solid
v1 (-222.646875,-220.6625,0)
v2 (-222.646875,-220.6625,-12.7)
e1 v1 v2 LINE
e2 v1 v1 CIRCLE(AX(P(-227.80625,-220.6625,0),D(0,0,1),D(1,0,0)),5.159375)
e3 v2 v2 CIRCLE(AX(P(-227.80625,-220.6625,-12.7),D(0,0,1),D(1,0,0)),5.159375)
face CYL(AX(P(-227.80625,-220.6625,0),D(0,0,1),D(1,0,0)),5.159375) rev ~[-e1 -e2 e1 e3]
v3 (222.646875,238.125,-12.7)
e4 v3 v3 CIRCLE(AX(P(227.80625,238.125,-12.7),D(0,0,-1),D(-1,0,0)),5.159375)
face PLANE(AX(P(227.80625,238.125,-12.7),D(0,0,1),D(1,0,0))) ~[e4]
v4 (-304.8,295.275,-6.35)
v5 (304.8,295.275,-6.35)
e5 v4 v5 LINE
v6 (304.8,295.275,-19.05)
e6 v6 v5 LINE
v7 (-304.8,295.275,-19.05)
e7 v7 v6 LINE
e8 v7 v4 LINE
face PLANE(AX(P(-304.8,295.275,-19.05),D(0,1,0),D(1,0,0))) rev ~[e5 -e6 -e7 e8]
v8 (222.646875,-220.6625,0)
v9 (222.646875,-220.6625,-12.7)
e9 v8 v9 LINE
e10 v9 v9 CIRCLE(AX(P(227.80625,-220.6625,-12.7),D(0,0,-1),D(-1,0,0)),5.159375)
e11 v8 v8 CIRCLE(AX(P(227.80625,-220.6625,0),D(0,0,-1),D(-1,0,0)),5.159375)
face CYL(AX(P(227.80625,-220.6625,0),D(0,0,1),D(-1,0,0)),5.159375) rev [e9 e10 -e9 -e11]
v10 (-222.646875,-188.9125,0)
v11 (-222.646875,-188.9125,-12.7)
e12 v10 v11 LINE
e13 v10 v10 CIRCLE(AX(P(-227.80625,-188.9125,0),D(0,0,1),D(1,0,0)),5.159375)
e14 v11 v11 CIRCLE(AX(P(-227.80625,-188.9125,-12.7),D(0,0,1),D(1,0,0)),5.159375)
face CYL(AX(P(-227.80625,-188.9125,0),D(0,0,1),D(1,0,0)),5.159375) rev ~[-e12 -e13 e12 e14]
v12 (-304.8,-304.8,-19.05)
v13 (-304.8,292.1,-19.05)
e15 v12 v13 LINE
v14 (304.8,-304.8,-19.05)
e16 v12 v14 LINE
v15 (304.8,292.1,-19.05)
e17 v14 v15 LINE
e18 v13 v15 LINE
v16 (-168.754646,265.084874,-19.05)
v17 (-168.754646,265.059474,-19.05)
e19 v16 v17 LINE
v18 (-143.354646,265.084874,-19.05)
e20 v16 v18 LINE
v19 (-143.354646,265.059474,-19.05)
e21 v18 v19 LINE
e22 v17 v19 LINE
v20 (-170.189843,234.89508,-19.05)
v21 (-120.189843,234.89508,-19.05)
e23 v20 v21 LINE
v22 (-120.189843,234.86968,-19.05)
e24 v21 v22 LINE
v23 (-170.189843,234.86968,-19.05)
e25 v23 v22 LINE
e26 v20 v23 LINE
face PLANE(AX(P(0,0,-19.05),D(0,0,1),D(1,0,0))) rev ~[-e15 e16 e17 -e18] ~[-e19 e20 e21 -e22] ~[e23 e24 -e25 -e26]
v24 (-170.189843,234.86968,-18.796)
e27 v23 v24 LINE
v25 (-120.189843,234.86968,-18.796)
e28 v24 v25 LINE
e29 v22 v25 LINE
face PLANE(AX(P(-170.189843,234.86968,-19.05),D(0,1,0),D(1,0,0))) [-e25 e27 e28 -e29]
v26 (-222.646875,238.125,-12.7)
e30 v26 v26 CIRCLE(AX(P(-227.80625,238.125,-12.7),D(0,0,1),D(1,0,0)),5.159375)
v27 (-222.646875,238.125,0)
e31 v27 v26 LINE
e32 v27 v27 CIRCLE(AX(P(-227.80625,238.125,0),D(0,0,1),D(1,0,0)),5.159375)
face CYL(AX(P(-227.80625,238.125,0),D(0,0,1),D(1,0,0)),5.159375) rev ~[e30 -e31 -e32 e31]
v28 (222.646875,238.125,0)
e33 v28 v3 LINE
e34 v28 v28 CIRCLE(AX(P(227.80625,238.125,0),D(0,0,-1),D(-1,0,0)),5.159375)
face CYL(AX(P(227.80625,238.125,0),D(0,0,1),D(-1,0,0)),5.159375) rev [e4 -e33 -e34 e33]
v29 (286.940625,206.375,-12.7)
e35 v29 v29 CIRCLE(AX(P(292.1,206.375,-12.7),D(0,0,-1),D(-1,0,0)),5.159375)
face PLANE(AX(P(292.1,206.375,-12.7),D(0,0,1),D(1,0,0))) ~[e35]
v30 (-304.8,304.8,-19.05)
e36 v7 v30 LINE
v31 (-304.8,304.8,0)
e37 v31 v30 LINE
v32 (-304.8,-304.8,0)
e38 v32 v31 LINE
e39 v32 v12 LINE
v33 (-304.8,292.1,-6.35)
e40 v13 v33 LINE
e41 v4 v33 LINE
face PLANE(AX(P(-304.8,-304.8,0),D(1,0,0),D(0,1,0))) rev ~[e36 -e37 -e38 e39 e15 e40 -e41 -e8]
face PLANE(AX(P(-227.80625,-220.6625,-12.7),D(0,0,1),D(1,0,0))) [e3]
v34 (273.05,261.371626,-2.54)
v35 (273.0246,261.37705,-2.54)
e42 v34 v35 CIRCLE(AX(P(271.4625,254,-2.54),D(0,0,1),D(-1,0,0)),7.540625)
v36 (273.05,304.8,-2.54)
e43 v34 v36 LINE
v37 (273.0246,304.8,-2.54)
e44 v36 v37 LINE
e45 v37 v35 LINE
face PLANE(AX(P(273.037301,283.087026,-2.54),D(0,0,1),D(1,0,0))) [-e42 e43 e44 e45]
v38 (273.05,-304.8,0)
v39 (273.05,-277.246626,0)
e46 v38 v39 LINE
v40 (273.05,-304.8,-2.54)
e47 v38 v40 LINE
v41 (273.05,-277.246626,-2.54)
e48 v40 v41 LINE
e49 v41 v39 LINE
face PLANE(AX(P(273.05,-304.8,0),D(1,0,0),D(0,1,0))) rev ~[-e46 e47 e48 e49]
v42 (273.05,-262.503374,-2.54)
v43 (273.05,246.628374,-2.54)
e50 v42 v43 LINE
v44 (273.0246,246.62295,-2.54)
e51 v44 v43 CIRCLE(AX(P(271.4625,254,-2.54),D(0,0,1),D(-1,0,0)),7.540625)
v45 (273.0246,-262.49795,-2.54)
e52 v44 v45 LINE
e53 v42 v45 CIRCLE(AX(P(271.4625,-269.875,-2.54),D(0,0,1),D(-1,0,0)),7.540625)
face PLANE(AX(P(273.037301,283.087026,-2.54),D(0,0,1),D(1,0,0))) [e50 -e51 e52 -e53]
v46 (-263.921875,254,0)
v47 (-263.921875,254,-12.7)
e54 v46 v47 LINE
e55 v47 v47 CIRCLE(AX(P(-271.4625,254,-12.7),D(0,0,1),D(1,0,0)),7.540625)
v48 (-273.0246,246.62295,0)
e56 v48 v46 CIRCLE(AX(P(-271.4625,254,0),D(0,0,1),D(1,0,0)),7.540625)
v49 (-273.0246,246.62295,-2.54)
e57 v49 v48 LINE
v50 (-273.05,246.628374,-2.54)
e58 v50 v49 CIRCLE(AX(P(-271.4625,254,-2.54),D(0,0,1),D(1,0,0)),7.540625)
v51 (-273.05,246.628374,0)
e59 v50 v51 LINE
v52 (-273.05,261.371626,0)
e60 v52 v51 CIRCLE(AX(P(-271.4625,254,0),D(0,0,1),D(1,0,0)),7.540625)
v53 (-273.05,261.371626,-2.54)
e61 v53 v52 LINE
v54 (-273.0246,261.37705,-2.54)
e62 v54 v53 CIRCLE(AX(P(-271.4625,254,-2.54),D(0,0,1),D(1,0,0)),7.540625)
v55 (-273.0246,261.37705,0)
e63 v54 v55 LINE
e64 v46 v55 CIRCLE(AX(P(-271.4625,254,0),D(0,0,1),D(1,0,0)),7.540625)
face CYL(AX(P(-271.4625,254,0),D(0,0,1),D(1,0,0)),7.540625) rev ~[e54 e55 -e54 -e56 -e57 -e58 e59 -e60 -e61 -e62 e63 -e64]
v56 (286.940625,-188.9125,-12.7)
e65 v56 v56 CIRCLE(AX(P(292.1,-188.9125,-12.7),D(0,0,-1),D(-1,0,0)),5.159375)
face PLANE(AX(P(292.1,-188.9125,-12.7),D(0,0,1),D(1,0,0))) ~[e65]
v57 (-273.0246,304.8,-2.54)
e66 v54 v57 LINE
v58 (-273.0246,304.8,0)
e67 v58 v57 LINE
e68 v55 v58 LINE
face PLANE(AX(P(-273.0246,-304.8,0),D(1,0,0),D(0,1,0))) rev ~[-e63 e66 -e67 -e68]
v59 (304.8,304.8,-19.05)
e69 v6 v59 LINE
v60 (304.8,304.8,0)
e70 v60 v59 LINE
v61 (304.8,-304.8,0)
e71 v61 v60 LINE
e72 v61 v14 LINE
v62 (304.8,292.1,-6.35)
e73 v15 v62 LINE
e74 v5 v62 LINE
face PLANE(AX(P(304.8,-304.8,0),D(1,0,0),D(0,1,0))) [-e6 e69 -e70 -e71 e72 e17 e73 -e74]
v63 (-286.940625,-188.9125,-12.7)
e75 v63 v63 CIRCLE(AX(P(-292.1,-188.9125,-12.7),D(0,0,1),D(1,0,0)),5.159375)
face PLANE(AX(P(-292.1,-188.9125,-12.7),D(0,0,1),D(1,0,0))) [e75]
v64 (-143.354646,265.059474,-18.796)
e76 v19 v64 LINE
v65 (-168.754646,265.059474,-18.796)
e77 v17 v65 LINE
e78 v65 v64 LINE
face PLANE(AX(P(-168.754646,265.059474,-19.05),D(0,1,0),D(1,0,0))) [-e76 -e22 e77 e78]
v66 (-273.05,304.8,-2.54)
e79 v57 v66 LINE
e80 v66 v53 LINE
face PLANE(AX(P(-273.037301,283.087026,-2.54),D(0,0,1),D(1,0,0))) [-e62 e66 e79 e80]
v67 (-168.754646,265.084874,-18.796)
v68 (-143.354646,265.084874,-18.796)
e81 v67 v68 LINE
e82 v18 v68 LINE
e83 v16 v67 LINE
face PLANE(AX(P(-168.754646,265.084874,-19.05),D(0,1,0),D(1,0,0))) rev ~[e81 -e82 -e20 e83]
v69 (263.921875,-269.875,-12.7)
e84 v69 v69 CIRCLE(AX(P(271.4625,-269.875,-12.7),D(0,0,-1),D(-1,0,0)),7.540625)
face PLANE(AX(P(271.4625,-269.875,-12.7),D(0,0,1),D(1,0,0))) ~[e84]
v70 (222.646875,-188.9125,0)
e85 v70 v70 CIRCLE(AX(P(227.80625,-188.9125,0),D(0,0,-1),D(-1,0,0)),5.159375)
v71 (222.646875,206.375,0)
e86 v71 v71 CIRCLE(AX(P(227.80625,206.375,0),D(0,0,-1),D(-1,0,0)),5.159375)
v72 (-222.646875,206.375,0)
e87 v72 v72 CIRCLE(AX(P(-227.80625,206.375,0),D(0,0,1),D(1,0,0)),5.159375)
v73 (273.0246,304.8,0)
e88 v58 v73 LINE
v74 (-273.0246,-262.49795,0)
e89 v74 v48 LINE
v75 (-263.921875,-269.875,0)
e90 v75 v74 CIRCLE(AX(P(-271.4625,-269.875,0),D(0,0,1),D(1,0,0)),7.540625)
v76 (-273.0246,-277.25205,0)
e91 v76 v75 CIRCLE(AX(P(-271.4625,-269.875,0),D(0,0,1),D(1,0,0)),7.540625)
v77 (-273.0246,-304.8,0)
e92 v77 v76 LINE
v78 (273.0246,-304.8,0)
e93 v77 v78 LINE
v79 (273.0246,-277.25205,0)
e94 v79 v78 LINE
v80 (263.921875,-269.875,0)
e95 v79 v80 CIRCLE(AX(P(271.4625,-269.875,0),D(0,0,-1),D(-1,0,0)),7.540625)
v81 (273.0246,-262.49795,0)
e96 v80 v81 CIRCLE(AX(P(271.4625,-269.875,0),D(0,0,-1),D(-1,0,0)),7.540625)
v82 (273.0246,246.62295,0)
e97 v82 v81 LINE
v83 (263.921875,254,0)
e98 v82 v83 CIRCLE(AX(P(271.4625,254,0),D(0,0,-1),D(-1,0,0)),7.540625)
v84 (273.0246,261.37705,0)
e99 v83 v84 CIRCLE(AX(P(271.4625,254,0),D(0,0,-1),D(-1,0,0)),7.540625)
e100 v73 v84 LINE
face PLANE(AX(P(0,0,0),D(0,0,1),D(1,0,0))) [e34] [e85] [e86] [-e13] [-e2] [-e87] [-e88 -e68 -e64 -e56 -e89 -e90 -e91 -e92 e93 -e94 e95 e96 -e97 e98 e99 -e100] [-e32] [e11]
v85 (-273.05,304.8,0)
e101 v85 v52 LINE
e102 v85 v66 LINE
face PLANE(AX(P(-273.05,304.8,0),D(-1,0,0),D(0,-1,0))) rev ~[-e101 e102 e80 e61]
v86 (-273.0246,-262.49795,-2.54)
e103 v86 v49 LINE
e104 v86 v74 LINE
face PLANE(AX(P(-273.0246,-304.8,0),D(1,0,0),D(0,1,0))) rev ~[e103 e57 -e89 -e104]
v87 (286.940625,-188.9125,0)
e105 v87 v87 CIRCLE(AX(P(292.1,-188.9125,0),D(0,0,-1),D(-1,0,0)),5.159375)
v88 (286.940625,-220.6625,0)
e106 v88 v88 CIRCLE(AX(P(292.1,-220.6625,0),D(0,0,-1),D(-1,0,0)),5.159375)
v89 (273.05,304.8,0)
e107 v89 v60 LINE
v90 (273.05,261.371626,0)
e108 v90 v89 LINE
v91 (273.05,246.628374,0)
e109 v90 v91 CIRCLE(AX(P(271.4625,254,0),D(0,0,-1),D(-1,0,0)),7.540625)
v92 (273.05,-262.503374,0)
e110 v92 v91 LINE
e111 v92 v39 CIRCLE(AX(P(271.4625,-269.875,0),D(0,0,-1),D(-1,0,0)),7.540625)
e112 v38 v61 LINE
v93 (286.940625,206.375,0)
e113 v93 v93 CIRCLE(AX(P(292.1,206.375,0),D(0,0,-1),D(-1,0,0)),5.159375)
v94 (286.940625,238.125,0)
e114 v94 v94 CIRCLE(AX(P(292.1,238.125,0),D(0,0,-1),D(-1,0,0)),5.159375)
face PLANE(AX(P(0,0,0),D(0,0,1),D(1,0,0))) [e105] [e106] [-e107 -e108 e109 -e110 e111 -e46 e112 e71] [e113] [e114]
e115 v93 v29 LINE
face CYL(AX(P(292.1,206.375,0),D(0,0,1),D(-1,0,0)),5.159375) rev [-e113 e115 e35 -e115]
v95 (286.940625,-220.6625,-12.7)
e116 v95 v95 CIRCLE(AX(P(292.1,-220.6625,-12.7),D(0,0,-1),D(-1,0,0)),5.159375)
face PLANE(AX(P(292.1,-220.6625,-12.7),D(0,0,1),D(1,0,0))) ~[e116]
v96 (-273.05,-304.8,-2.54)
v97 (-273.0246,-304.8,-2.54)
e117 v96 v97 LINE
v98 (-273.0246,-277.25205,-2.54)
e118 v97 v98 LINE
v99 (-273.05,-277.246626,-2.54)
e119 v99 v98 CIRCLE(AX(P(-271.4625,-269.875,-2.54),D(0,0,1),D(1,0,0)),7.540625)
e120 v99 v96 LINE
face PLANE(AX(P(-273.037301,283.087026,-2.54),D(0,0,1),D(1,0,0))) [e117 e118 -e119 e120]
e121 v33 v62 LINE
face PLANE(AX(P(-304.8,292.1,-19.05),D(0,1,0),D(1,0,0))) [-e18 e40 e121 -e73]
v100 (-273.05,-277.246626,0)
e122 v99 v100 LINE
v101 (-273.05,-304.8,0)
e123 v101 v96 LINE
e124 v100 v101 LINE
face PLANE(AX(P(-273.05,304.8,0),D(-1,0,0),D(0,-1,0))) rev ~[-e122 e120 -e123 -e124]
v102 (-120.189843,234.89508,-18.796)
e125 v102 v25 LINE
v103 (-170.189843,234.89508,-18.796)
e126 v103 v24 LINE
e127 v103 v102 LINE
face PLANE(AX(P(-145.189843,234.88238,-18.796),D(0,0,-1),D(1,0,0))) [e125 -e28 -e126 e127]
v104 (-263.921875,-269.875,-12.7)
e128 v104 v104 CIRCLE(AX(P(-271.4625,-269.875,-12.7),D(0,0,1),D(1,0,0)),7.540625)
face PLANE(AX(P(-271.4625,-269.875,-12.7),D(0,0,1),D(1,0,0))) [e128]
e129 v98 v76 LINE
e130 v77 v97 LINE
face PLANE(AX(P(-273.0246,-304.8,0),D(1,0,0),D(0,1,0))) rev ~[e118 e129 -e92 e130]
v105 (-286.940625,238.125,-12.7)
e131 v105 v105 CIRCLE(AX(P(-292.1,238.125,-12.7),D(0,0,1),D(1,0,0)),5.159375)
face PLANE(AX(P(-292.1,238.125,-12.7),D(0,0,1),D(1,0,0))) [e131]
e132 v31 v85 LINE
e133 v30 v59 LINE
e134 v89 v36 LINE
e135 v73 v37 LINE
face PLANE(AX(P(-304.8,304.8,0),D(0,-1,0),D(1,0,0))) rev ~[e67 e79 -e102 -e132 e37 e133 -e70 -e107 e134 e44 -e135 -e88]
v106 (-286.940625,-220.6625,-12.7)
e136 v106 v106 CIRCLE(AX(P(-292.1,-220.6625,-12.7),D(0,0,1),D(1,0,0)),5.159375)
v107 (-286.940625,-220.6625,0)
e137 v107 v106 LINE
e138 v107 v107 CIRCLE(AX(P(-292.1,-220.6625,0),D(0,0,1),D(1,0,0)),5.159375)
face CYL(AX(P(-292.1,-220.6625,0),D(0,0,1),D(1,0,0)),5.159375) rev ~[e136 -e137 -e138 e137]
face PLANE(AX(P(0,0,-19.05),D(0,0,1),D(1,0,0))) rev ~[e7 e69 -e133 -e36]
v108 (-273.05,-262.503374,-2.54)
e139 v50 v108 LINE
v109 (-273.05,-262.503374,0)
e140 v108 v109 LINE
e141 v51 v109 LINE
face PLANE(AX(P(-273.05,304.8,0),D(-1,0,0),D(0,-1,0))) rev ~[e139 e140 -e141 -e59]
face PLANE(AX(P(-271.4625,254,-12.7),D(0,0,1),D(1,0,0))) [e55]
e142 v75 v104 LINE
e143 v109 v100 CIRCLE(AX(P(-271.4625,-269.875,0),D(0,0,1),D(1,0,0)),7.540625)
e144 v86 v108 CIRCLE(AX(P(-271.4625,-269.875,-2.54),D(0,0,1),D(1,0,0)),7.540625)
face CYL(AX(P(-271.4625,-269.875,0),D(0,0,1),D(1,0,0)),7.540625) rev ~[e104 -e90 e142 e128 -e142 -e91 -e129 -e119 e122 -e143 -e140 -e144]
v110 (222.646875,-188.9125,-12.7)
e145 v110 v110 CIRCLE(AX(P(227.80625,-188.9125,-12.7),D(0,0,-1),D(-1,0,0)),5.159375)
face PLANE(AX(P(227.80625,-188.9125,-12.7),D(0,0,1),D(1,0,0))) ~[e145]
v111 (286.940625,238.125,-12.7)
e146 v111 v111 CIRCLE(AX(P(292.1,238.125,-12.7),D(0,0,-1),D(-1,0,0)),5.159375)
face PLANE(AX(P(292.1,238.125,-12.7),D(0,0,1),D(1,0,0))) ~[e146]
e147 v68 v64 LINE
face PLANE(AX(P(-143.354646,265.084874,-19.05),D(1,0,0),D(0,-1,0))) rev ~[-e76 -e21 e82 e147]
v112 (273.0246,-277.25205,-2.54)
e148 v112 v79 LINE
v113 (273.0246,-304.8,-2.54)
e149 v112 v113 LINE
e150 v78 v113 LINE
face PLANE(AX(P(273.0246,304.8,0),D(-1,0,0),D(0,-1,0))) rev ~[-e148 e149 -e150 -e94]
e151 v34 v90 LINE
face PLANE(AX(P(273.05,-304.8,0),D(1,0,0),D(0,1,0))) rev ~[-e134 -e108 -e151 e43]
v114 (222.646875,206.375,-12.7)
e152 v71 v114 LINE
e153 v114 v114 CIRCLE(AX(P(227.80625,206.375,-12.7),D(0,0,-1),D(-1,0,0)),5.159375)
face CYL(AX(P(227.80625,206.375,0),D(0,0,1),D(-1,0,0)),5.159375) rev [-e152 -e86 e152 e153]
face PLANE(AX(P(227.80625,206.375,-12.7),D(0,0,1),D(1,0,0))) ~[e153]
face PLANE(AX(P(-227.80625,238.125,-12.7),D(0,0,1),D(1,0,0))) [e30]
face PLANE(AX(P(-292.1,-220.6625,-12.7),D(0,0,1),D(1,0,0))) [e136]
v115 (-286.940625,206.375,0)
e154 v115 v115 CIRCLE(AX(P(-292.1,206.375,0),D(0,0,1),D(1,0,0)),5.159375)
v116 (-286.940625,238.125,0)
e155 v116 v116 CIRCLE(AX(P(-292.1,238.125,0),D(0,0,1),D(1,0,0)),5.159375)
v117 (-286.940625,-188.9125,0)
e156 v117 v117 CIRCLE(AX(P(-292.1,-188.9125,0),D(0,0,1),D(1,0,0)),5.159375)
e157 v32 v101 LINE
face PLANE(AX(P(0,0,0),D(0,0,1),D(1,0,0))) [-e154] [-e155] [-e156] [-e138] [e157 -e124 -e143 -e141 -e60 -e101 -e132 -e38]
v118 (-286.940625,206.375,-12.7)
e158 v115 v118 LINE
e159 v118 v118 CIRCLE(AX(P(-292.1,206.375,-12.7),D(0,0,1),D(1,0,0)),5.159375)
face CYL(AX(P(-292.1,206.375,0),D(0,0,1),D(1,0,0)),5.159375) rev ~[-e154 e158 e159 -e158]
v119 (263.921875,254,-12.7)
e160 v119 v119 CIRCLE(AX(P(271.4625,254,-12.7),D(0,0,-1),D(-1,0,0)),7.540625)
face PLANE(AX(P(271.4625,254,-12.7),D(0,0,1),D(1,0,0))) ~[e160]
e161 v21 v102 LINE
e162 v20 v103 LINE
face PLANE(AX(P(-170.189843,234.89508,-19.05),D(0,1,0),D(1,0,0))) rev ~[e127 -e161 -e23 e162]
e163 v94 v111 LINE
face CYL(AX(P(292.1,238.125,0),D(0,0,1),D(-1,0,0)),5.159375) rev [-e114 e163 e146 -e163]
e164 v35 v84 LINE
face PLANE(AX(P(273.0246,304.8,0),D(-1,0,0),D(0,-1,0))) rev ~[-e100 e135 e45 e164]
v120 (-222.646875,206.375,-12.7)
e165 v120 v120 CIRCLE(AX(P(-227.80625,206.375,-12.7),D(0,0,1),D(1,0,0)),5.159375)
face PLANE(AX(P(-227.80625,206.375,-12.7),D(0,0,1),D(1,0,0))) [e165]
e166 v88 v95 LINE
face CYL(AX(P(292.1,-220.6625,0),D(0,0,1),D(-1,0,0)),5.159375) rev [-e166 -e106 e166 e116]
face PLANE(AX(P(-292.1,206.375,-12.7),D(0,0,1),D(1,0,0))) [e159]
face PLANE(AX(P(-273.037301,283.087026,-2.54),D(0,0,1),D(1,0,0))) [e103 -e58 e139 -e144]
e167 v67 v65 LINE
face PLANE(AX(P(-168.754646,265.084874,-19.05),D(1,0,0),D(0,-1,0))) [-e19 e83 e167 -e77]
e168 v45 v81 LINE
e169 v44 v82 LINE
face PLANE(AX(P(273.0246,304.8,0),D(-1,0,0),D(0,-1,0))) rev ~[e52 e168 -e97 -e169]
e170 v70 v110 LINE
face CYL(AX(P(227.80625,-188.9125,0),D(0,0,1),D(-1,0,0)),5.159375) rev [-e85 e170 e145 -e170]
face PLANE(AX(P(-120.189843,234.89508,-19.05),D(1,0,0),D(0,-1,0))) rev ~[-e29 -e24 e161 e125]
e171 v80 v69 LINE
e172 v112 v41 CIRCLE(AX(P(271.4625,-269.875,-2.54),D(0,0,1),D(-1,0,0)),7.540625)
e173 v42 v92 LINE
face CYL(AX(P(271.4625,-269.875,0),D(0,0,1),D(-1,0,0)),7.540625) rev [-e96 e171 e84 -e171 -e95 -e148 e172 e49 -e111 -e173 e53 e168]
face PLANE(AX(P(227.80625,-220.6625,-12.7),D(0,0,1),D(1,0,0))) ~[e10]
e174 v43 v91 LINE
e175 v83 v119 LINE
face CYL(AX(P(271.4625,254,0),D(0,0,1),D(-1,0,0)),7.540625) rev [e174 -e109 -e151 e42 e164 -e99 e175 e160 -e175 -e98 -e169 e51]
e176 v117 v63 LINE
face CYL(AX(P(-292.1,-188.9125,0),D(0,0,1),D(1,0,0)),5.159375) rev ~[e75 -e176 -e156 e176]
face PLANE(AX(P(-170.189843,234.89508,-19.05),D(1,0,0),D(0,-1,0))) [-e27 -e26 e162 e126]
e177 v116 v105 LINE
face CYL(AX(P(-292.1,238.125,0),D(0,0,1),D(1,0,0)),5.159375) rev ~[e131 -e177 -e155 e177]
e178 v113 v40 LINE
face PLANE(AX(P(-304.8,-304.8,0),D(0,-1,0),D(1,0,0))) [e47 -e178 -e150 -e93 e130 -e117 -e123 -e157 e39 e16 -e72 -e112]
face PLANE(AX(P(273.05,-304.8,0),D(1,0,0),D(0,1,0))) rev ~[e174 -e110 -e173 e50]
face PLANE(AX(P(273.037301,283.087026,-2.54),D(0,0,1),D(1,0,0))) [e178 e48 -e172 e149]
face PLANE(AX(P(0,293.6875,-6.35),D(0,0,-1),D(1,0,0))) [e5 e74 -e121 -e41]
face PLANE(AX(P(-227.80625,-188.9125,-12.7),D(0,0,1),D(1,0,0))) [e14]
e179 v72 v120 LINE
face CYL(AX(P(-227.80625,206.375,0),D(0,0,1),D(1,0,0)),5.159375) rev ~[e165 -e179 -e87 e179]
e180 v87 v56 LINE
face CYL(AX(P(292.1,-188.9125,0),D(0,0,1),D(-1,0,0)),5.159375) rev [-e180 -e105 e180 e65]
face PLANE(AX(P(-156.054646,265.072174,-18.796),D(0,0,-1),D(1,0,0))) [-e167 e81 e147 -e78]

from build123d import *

# Parameters (mm, degrees)
F0_W     = 609.6
F0_H     = 609.6
F0_R     = 7.540625
F0_R_2   = 5.159375
F1_DEPTH = 19.05
F2_DEPTH = 12.7
F3_W     = 609.6
F3_H     = 3.175
F4_DEPTH = 12.7
F5_W     = 25.4
F5_H     = 0.0254
F5_W_2   = 50
F6_DEPTH = 0.254
F8_DEPTH = 2.54


# Not quite as in the source:
# - a pattern or mirror of a feature is missing from the dataset's text; its kind, count and spacing are read off the source's solid
# - a feature names something its author has since deleted; it is built from what else it names


with BuildPart() as f1:
    # F0 (on Top) → F1 (new body)
    with BuildSketch(Plane.XY):
        Rectangle(F0_W, F0_H)
        with Locations((-271.4625, -269.875)):
            Circle(F0_R, mode=Mode.SUBTRACT)
        with Locations((-292.1, -220.6625)):
            Circle(F0_R_2, mode=Mode.SUBTRACT)
        with Locations((-292.1, -188.9125)):
            Circle(F0_R_2, mode=Mode.SUBTRACT)
        with Locations((-227.80625, -220.6625)):
            Circle(F0_R_2, mode=Mode.SUBTRACT)
        with Locations((-227.80625, -188.9125)):
            Circle(F0_R_2, mode=Mode.SUBTRACT)
        with Locations((-292.1, 206.375)):
            Circle(F0_R_2, mode=Mode.SUBTRACT)
        with Locations((-227.80625, 206.375)):
            Circle(F0_R_2, mode=Mode.SUBTRACT)
        with Locations((-292.1, 238.125)):
            Circle(F0_R_2, mode=Mode.SUBTRACT)
        with Locations((-271.4625, 254)):
            Circle(F0_R, mode=Mode.SUBTRACT)
        with Locations((-227.80625, 238.125)):
            Circle(F0_R_2, mode=Mode.SUBTRACT)
        with Locations((-227.80625, 206.375)):
            Circle(F0_R_2)
        with Locations((-227.80625, 238.125)):
            Circle(F0_R_2)
        with Locations((-227.80625, -188.9125)):
            Circle(F0_R_2)
        with Locations((-227.80625, -220.6625)):
            Circle(F0_R_2)
        with Locations((-271.4625, -269.875)):
            Circle(F0_R)
        with Locations((-271.4625, 254)):
            Circle(F0_R)
        with Locations((-292.1, 238.125)):
            Circle(F0_R_2)
        with Locations((-292.1, 206.375)):
            Circle(F0_R_2)
        with Locations((-292.1, -220.6625)):
            Circle(F0_R_2)
        with Locations((-292.1, -188.9125)):
            Circle(F0_R_2)
    extrude(amount=-F1_DEPTH)

    # F0 (on Top) → F2 (cut)
    with BuildSketch(Plane.XY):
        with Locations((-271.4625, -269.875)):
            Circle(F0_R)
        with Locations((-292.1, -220.6625)):
            Circle(F0_R_2)
        with Locations((-227.80625, -220.6625)):
            Circle(F0_R_2)
        with Locations((-227.80625, -188.9125)):
            Circle(F0_R_2)
        with Locations((-292.1, -188.9125)):
            Circle(F0_R_2)
        with Locations((-292.1, 206.375)):
            Circle(F0_R_2)
        with Locations((-227.80625, 206.375)):
            Circle(F0_R_2)
        with Locations((-227.80625, 238.125)):
            Circle(F0_R_2)
        with Locations((-292.1, 238.125)):
            Circle(F0_R_2)
        with Locations((-271.4625, 254)):
            Circle(F0_R)
    f2 = extrude(amount=-F2_DEPTH, mode=Mode.SUBTRACT)

    # F2_copies: F2 across plane
    add(f2.mirror(Plane(origin=(0, 0, 0), x_dir=(0, 0, 1), z_dir=(1, 0, 0))), mode=Mode.SUBTRACT)

    # F3 (on face) → F4 (cut)
    with BuildSketch(Plane(origin=(0, 0, -19.05), x_dir=(1, 0, 0), z_dir=(0, 0, -1))):
        with Locations((0, -293.6875)):
            Rectangle(F3_W, F3_H)
    extrude(amount=-F4_DEPTH, mode=Mode.SUBTRACT)

    # F5 (on face) → F6 (cut)
    with BuildSketch(Plane(origin=(0, 0, -19.05), x_dir=(1, 0, 0), z_dir=(0, 0, -1))):
        with Locations((-156.0546457767, -265.0721735465)):
            Rectangle(F5_W, F5_H)
        with Locations((-145.1898425817, -234.882380328)):
            Rectangle(F5_W_2, F5_H)
    extrude(amount=-F6_DEPTH, mode=Mode.SUBTRACT)

    # F7 (on face) → F8 (cut)
    with BuildSketch(Plane.XY):
        with BuildLine():
            Line((273.05, 304.8), (273.0246, 304.8))
            Line((273.0246, 304.8), (273.0246, 261.3770501544))
            ThreePointArc((273.0246, 261.3770501544), (273.0373023354, 261.3743489879), (273.05, 261.3716259496))
            Line((273.05, 261.3716259496), (273.05, 304.8))
        make_face()
        with BuildLine():
            ThreePointArc((273.05, 261.3716259496), (273.0373023354, 261.3743489879), (273.0246, 261.3770501544))
            Line((273.0246, 261.3770501544), (273.0246, 246.6229498456))
            ThreePointArc((273.0246, 246.6229498456), (273.0373023354, 246.6256510121), (273.05, 246.6283740504))
            Line((273.05, 246.6283740504), (273.05, 261.3716259496))
        make_face()
        with BuildLine():
            ThreePointArc((273.05, 246.6283740504), (273.0373023354, 246.6256510121), (273.0246, 246.6229498456))
            Line((273.0246, 246.6229498456), (273.0246, -262.4979498456))
            ThreePointArc((273.0246, -262.4979498456), (273.0373023354, -262.5006510121), (273.05, -262.5033740504))
            Line((273.05, -262.5033740504), (273.05, 246.6283740504))
        make_face()
        with BuildLine():
            ThreePointArc((273.05, -262.5033740504), (273.0373023354, -262.5006510121), (273.0246, -262.4979498456))
            Line((273.0246, -262.4979498456), (273.0246, -277.2520501544))
            ThreePointArc((273.0246, -277.2520501544), (273.0373023354, -277.2493489879), (273.05, -277.2466259496))
            Line((273.05, -277.2466259496), (273.05, -262.5033740504))
        make_face()
        with BuildLine():
            Line((273.0246, -277.2520501544), (273.0246, -304.8))
            Line((273.0246, -304.8), (273.05, -304.8))
            Line((273.05, -304.8), (273.05, -277.2466259496))
            ThreePointArc((273.05, -277.2466259496), (273.0373023354, -277.2493489879), (273.0246, -277.2520501544))
        make_face()
        with BuildLine():
            Line((-273.0246, 304.8), (-273.05, 304.8))
            Line((-273.05, 304.8), (-273.05, 261.3716259496))
            ThreePointArc((-273.05, 261.3716259496), (-273.0373023354, 261.3743489879), (-273.0246, 261.3770501544))
            Line((-273.0246, 261.3770501544), (-273.0246, 304.8))
        make_face()
        with BuildLine():
            ThreePointArc((-273.0246, 261.3770501544), (-273.0373023354, 261.3743489879), (-273.05, 261.3716259496))
            Line((-273.05, 261.3716259496), (-273.05, 246.6283740504))
            ThreePointArc((-273.05, 246.6283740504), (-273.0373023354, 246.6256510121), (-273.0246, 246.6229498456))
            Line((-273.0246, 246.6229498456), (-273.0246, 261.3770501544))
        make_face()
        with BuildLine():
            ThreePointArc((-273.0246, -262.4979498456), (-273.0373023354, -262.5006510121), (-273.05, -262.5033740504))
            Line((-273.05, -262.5033740504), (-273.05, -277.2466259496))
            ThreePointArc((-273.05, -277.2466259496), (-273.0373023354, -277.2493489879), (-273.0246, -277.2520501544))
            Line((-273.0246, -277.2520501544), (-273.0246, -262.4979498456))
        make_face()
        with BuildLine():
            Line((-273.05, -277.2466259496), (-273.05, -304.8))
            Line((-273.05, -304.8), (-273.0246, -304.8))
            Line((-273.0246, -304.8), (-273.0246, -277.2520501544))
            ThreePointArc((-273.0246, -277.2520501544), (-273.0373023354, -277.2493489879), (-273.05, -277.2466259496))
        make_face()
        with BuildLine():
            ThreePointArc((-273.0246, 246.6229498456), (-273.0373023354, 246.6256510121), (-273.05, 246.6283740504))
            Line((-273.05, 246.6283740504), (-273.05, -262.5033740504))
            ThreePointArc((-273.05, -262.5033740504), (-273.0373023354, -262.5006510121), (-273.0246, -262.4979498456))
            Line((-273.0246, -262.4979498456), (-273.0246, 246.6229498456))
        make_face()
    extrude(amount=-F8_DEPTH, mode=Mode.SUBTRACT)


solid = f1.part
